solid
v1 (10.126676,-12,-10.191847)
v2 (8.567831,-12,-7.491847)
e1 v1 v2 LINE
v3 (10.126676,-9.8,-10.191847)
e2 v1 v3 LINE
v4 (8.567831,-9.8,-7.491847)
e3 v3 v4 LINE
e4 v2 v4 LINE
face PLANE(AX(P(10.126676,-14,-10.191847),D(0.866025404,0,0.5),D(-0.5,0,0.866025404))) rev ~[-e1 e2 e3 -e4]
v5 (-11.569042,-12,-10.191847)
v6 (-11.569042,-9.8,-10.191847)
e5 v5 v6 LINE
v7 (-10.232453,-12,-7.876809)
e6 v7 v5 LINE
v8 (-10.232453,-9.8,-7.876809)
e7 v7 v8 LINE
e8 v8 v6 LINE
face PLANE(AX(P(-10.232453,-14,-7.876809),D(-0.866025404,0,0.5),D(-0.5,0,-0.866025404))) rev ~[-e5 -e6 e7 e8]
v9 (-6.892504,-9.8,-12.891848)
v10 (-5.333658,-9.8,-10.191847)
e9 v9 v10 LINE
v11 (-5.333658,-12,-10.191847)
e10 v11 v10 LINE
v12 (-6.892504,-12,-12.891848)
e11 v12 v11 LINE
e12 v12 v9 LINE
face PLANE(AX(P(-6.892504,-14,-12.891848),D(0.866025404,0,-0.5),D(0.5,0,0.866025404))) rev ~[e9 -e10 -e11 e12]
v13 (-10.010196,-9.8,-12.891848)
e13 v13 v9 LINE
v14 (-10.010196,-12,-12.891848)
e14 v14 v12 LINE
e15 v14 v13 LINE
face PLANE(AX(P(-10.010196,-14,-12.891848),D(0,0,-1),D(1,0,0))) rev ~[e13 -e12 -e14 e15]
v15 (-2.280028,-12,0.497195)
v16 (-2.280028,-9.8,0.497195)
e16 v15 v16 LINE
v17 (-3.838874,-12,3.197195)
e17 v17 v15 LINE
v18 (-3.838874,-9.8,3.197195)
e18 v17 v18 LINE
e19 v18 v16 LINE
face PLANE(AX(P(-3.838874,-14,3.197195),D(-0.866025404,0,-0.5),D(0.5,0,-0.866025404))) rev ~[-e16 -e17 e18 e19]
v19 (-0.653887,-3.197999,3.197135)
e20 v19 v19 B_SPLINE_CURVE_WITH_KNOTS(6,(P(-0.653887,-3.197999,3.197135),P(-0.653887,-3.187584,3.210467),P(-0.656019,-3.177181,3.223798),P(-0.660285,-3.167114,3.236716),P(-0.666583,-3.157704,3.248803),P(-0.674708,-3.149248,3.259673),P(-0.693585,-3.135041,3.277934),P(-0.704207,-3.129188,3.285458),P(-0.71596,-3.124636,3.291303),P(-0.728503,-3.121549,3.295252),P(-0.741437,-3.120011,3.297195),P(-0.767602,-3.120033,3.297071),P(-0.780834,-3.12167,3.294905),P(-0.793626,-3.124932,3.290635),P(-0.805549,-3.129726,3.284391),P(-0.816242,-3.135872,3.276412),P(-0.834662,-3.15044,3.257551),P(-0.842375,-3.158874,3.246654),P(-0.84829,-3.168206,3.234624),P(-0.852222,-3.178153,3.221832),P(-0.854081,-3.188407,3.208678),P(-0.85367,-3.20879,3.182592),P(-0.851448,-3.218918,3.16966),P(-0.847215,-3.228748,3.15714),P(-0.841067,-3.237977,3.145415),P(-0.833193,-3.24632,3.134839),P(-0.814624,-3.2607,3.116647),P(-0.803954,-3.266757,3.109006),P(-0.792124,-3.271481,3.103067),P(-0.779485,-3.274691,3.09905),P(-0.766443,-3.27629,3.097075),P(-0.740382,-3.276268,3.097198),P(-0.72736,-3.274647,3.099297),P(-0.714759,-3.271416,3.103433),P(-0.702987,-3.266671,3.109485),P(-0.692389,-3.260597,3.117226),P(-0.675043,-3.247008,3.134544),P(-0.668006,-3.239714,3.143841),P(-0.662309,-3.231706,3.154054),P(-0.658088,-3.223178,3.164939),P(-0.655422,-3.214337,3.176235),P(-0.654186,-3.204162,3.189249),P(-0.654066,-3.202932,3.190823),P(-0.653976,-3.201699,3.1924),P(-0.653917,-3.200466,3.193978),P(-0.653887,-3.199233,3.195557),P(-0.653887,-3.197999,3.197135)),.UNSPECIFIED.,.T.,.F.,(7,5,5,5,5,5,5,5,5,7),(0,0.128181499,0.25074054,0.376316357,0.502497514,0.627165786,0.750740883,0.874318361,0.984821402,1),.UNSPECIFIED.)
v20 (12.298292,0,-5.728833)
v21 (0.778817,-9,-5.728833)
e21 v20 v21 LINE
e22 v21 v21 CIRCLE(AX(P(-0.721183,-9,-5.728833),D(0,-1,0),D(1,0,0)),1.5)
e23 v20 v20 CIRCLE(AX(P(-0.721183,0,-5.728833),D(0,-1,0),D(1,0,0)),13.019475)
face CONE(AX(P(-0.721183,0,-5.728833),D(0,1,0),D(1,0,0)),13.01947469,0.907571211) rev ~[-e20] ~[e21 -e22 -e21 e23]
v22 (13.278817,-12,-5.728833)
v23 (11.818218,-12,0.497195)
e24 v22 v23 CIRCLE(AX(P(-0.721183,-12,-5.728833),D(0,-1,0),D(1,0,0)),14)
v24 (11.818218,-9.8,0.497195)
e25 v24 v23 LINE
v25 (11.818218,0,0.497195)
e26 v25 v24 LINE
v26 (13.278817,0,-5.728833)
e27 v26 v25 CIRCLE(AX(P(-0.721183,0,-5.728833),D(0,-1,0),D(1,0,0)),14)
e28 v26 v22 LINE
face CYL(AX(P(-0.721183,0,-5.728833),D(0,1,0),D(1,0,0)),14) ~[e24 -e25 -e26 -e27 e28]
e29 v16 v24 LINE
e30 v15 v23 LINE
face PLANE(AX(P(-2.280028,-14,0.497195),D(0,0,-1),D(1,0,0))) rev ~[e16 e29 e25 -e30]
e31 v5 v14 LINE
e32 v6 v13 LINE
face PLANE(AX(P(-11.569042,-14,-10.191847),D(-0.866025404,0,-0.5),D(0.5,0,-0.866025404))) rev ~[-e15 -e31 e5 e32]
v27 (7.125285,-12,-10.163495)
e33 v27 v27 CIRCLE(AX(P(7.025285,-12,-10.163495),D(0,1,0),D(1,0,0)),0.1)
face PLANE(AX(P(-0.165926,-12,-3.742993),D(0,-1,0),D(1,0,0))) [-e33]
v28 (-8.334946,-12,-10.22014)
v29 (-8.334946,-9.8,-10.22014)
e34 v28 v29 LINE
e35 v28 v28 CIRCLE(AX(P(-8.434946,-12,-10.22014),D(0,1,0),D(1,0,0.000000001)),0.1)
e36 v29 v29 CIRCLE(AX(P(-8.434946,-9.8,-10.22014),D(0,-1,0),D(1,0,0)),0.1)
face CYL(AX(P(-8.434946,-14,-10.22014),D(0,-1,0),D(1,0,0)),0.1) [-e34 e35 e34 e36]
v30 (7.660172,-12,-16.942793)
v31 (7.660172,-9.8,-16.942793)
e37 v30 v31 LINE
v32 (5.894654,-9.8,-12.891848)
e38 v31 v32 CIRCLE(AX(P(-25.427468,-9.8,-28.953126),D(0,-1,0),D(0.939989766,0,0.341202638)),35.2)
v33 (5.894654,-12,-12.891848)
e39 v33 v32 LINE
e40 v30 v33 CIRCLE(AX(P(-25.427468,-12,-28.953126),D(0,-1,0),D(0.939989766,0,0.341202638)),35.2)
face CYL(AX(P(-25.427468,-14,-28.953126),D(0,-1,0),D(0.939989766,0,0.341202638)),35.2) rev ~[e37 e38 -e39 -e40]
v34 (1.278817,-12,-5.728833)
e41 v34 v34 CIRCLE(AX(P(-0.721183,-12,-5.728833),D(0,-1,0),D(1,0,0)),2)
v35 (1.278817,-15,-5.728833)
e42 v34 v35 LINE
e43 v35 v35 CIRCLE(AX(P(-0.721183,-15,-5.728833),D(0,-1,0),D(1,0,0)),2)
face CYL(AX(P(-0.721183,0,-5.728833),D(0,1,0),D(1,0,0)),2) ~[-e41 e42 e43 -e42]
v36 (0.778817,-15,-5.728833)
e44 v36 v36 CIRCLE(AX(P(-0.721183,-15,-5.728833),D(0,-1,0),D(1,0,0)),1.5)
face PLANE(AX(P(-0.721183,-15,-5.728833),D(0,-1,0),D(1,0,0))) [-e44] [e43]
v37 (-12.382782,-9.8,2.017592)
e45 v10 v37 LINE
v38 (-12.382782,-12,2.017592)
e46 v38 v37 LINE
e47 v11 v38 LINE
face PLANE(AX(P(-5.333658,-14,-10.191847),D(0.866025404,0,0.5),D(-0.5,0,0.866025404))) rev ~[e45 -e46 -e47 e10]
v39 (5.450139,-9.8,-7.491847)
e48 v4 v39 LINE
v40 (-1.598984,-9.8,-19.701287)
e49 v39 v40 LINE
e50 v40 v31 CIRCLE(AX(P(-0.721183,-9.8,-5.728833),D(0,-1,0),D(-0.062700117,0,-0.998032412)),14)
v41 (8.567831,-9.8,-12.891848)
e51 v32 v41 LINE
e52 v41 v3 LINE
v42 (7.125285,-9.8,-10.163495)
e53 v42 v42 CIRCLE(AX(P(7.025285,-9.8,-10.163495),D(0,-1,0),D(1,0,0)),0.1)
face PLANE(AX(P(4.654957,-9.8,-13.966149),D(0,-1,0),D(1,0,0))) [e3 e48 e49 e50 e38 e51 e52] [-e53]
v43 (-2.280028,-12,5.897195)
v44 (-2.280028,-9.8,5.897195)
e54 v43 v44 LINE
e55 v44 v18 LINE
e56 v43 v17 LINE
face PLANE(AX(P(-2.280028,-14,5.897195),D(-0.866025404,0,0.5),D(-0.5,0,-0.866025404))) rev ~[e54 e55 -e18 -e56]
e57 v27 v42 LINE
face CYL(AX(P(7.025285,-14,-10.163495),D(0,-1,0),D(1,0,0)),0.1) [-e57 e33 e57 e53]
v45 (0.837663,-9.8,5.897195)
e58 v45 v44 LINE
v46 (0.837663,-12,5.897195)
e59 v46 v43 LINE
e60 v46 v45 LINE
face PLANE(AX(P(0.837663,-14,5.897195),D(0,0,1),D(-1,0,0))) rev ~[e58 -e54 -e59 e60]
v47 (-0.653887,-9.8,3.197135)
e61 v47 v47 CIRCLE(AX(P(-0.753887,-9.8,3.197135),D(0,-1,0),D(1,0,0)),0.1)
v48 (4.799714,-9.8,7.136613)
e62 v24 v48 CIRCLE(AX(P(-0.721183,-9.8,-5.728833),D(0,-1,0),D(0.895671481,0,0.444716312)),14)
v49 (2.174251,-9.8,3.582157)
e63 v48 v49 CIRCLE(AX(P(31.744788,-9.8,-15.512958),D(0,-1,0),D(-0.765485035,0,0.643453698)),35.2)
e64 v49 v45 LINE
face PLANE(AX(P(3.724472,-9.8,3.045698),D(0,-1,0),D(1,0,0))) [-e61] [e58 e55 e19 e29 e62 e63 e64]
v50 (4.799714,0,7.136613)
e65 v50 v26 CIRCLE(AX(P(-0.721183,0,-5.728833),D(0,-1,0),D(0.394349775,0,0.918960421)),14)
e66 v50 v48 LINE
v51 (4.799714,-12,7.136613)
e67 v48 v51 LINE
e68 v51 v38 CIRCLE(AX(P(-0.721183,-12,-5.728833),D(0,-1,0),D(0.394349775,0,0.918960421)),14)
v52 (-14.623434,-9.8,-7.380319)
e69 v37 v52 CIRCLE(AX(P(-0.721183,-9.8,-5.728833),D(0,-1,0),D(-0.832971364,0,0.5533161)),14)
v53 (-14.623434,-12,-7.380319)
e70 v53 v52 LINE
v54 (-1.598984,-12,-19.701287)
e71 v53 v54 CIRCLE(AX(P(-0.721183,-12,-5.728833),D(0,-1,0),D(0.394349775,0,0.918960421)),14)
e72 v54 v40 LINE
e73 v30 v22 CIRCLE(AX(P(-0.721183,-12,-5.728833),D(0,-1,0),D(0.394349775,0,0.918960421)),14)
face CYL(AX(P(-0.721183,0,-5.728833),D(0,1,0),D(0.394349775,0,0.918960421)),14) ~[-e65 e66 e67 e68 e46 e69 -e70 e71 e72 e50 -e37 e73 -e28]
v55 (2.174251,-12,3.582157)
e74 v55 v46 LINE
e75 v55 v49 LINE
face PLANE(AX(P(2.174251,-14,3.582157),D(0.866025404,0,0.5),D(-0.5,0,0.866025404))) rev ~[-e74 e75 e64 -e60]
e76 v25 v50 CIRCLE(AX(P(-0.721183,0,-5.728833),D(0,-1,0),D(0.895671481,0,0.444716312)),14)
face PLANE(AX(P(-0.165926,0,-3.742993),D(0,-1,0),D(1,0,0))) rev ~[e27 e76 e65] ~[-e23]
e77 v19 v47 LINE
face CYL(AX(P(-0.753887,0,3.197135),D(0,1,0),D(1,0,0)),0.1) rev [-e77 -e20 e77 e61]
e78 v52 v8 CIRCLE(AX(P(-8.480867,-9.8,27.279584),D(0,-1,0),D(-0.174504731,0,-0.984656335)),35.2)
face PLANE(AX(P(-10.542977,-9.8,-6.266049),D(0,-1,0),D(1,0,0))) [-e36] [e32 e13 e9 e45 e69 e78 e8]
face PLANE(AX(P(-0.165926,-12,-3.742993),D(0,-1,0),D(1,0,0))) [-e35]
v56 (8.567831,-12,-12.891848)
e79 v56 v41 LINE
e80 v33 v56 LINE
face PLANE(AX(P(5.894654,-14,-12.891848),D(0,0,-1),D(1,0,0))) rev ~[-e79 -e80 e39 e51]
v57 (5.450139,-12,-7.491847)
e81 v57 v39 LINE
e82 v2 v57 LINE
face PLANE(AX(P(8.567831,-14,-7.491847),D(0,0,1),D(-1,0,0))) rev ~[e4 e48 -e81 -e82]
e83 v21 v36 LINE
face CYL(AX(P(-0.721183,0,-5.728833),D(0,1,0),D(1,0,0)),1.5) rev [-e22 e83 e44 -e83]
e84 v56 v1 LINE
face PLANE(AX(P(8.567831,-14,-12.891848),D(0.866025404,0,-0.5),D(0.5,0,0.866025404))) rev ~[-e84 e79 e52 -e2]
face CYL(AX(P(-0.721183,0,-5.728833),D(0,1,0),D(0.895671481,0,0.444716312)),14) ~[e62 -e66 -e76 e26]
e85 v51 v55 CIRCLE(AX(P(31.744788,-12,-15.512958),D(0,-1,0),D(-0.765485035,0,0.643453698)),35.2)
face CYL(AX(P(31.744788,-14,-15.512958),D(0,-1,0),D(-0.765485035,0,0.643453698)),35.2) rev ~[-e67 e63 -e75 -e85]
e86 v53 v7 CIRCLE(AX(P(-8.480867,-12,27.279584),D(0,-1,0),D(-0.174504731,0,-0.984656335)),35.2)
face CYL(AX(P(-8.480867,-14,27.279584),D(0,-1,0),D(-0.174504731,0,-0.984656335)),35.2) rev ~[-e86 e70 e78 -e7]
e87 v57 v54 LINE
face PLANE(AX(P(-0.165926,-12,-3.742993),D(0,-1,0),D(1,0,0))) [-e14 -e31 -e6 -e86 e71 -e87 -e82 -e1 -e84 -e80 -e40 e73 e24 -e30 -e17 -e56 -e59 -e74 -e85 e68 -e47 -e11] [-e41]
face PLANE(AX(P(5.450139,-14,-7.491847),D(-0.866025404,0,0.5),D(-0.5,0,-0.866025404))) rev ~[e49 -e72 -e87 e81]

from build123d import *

# Parameters (mm, degrees)
F0_R      = 2
F0_R_2    = 0.1
F1_DEPTH  = 12
F0_R_3    = 1.5
F2_DEPTH  = 15
F4_R      = 0.1
F5_DEPTH  = 2
F6_COUNT  = 3
F5_FACE_R = 0.1
F6_FACE_R = 0.1
F7_DEPTH  = 4.2


# Not quite as in the source:
# - a fillet or chamfer that OpenCascade refuses, or shapes differently, is made with other operations: its cross-section is extruded or revolved along the edge and cut away or added


with BuildPart() as f1:
    # F0 (on Front) → F1 (new body)
    with BuildSketch(Plane.XZ):
        with BuildLine():
            ThreePointArc((4.7997142496, 7.1366126269), (-12.410762485, -13.4329699503), (13.278817402, -5.728833265))
            ThreePointArc((13.278817402, -5.728833265), (12.9087772386, -2.5313037732), (11.8182181375, 0.4971950993))
            Line((11.8182181375, 0.4971950993), (-2.2800283653, 0.4971950993))
            Line((-2.2800283653, 0.4971950993), (-3.8388741325, 3.1971951693))
            Line((-3.8388741325, 3.1971951693), (-2.2800283653, 5.8971952394))
            Line((-2.2800283653, 5.8971952394), (0.8376631692, 5.8971952394))
            Line((0.8376631692, 5.8971952394), (2.174251278, 3.5821567261))
            ThreePointArc((2.174251278, 3.5821567261), (3.4311500139, 5.4006249736), (4.7997142496, 7.1366126269))
        make_face()
        with Locations((-0.721182598, -5.728833265)):
            Circle(F0_R, mode=Mode.SUBTRACT)
        with BuildLine():
            Line((-2.2800283653, 0.4971950993), (11.8182181375, 0.4971950993))
            ThreePointArc((11.8182181375, 0.4971950993), (8.8998388381, 4.4415131659), (4.7997142496, 7.1366126269))
            ThreePointArc((4.7997142496, 7.1366126269), (3.4311500139, 5.4006249736), (2.174251278, 3.5821567261))
            Line((2.174251278, 3.5821567261), (0.8376631692, 5.8971952394))
            Line((0.8376631692, 5.8971952394), (-2.2800283653, 5.8971952394))
            Line((-2.2800283653, 5.8971952394), (-3.8388741325, 3.1971951693))
            Line((-3.8388741325, 3.1971951693), (-2.2800283653, 0.4971950993))
        make_face()
        with Locations((-0.7538866513, 3.197135257)):
            Circle(F0_R_2, mode=Mode.SUBTRACT)
    extrude(amount=F1_DEPTH)

    # F0 (on Front) → F2 (join)
    with BuildSketch(Plane.XZ):
        with Locations((-0.721182598, -5.728833265)):
            Circle(F0_R)
        with Locations((-0.721182598, -5.728833265)):
            Circle(F0_R_3, mode=Mode.SUBTRACT)
    extrude(amount=F2_DEPTH)

    # F3: chamfer of 9 x 11.5194746897 on 1 edges, made by hand

    # F3_s1 → F3_t2 (revolve, cut)
    with BuildSketch(Plane.XY.offset(-5.728833265)):
        Polygon((12.2982920917, 0), (0.778817402, -9), (0.778817402, 0), align=None)
    revolve(axis=Axis((-0.721182598, 0, -5.728833265), (0, -1, 0)), mode=Mode.SUBTRACT)

    # F6: F5 ×3 about axis
    f6_axis = Axis((-0.721182598, 0, -5.728833265), (0, -1, 0))


with BuildPart() as f5:
    # F4 (on face) → F5 (new body)
    with BuildSketch(Plane.XZ.offset(12)):
        with BuildLine():
            Line((-2.2800283653, 0.4971950993), (11.8182181375, 0.4971950993))
            ThreePointArc((11.8182181375, 0.4971950993), (8.8998388381, 4.4415131659), (4.7997142496, 7.1366126269))
            ThreePointArc((4.7997142496, 7.1366126269), (3.4311500139, 5.4006249736), (2.174251278, 3.5821567261))
            Line((2.174251278, 3.5821567261), (0.8376631692, 5.8971952394))
            Line((0.8376631692, 5.8971952394), (-2.2800283653, 5.8971952394))
            Line((-2.2800283653, 5.8971952394), (-3.8388741325, 3.1971951693))
            Line((-3.8388741325, 3.1971951693), (-2.2800283653, 0.4971950993))
        make_face()
        with Locations((-0.7538866513, 3.197135257)):
            Circle(F4_R, mode=Mode.SUBTRACT)
    extrude(amount=F5_DEPTH)


with BuildPart() as f1_1:
    add(f1.part)
    for i in range(1, F6_COUNT):
        add(f5.part.rotate(f6_axis, i * 360 / F6_COUNT))


with BuildPart() as f7_tool:
    # F5_face (on face) + F6_face (on face) → F7 (new body)
    with BuildSketch(Plane(origin=(3.5829132763, -14, 3.0354703716), x_dir=(1, 0, 0), z_dir=(0, -1, 0))):
        with BuildLine():
            Line((-5.8629416416, 2.8617248677), (-7.4217874088, 0.1617247977))
            Line((-7.4217874088, 0.1617247977), (-5.8629416416, -2.5382752723))
            Line((-5.8629416416, -2.5382752723), (8.2353048612, -2.5382752723))
            ThreePointArc((8.2353048612, -2.5382752723), (5.3169255618, 1.4060427943), (1.2168009733, 4.1011422553))
            ThreePointArc((1.2168009733, 4.1011422553), (-0.1517632624, 2.365154602), (-1.4086619983, 0.5466863545))
            Line((-1.4086619983, 0.5466863545), (-2.7452501071, 2.8617248677))
            Line((-2.7452501071, 2.8617248677), (-5.8629416416, 2.8617248677))
        make_face()
        with Locations((-4.3367999276, 0.1616648853)):
            Circle(F5_FACE_R, mode=Mode.SUBTRACT)
    with BuildSketch(Plane(origin=(4.7168790606, -14, -13.8384414508), x_dir=(1, 0, 0), z_dir=(0, -1, 0))):
        with BuildLine():
            Line((5.4097972549, 3.6465939687), (3.8509514876, 6.3465940387))
            Line((3.8509514876, 6.3465940387), (0.7332599531, 6.3465940387))
            Line((0.7332599531, 6.3465940387), (-6.3158632983, -5.8628455816))
            ThreePointArc((-6.3158632983, -5.8628455816), (-1.4407940022, -5.3076140037), (2.943292891, -3.1043516819))
            ThreePointArc((2.943292891, -3.1043516819), (2.1241656004, -1.0511464604), (1.17777527, 0.9465938986))
            Line((1.17777527, 0.9465938986), (3.8509514876, 0.9465938986))
            Line((3.8509514876, 0.9465938986), (5.4097972549, 3.6465939687))
        make_face()
        with Locations((2.3084058614, 3.6749464658)):
            Circle(F6_FACE_R, mode=Mode.SUBTRACT)
        with BuildLine():
            Line((-14.7270748049, 0.9465938986), (-11.6093832704, 0.9465938986))
            Line((-11.6093832704, 0.9465938986), (-10.0505375032, 3.6465939687))
            Line((-10.0505375032, 3.6465939687), (-17.0996607546, 15.8560335889))
            ThreePointArc((-17.0996607546, 15.8560335889), (-19.0563507512, 11.3564839444), (-19.3403130559, 6.4581221616))
            ThreePointArc((-19.3403130559, 6.4581221616), (-17.1526215296, 6.1409045934), (-14.9493324633, 5.9616324819))
            Line((-14.9493324633, 5.9616324819), (-16.2859205721, 3.6465939687))
            Line((-16.2859205721, 3.6465939687), (-14.7270748049, 0.9465938986))
        make_face()
        with Locations((-13.1518251254, 3.6183013839)):
            Circle(F6_FACE_R, mode=Mode.SUBTRACT)
    extrude(amount=-F7_DEPTH)


with BuildPart() as f1_2:
    add(f1_1.part)

    # F7: cut by f7_tool
    add(f7_tool.part, mode=Mode.SUBTRACT)


with BuildPart() as f5_1:
    add(f5.part)

    # F7: cut by f7_tool
    add(f7_tool.part, mode=Mode.SUBTRACT)


solid = f1_2.part
